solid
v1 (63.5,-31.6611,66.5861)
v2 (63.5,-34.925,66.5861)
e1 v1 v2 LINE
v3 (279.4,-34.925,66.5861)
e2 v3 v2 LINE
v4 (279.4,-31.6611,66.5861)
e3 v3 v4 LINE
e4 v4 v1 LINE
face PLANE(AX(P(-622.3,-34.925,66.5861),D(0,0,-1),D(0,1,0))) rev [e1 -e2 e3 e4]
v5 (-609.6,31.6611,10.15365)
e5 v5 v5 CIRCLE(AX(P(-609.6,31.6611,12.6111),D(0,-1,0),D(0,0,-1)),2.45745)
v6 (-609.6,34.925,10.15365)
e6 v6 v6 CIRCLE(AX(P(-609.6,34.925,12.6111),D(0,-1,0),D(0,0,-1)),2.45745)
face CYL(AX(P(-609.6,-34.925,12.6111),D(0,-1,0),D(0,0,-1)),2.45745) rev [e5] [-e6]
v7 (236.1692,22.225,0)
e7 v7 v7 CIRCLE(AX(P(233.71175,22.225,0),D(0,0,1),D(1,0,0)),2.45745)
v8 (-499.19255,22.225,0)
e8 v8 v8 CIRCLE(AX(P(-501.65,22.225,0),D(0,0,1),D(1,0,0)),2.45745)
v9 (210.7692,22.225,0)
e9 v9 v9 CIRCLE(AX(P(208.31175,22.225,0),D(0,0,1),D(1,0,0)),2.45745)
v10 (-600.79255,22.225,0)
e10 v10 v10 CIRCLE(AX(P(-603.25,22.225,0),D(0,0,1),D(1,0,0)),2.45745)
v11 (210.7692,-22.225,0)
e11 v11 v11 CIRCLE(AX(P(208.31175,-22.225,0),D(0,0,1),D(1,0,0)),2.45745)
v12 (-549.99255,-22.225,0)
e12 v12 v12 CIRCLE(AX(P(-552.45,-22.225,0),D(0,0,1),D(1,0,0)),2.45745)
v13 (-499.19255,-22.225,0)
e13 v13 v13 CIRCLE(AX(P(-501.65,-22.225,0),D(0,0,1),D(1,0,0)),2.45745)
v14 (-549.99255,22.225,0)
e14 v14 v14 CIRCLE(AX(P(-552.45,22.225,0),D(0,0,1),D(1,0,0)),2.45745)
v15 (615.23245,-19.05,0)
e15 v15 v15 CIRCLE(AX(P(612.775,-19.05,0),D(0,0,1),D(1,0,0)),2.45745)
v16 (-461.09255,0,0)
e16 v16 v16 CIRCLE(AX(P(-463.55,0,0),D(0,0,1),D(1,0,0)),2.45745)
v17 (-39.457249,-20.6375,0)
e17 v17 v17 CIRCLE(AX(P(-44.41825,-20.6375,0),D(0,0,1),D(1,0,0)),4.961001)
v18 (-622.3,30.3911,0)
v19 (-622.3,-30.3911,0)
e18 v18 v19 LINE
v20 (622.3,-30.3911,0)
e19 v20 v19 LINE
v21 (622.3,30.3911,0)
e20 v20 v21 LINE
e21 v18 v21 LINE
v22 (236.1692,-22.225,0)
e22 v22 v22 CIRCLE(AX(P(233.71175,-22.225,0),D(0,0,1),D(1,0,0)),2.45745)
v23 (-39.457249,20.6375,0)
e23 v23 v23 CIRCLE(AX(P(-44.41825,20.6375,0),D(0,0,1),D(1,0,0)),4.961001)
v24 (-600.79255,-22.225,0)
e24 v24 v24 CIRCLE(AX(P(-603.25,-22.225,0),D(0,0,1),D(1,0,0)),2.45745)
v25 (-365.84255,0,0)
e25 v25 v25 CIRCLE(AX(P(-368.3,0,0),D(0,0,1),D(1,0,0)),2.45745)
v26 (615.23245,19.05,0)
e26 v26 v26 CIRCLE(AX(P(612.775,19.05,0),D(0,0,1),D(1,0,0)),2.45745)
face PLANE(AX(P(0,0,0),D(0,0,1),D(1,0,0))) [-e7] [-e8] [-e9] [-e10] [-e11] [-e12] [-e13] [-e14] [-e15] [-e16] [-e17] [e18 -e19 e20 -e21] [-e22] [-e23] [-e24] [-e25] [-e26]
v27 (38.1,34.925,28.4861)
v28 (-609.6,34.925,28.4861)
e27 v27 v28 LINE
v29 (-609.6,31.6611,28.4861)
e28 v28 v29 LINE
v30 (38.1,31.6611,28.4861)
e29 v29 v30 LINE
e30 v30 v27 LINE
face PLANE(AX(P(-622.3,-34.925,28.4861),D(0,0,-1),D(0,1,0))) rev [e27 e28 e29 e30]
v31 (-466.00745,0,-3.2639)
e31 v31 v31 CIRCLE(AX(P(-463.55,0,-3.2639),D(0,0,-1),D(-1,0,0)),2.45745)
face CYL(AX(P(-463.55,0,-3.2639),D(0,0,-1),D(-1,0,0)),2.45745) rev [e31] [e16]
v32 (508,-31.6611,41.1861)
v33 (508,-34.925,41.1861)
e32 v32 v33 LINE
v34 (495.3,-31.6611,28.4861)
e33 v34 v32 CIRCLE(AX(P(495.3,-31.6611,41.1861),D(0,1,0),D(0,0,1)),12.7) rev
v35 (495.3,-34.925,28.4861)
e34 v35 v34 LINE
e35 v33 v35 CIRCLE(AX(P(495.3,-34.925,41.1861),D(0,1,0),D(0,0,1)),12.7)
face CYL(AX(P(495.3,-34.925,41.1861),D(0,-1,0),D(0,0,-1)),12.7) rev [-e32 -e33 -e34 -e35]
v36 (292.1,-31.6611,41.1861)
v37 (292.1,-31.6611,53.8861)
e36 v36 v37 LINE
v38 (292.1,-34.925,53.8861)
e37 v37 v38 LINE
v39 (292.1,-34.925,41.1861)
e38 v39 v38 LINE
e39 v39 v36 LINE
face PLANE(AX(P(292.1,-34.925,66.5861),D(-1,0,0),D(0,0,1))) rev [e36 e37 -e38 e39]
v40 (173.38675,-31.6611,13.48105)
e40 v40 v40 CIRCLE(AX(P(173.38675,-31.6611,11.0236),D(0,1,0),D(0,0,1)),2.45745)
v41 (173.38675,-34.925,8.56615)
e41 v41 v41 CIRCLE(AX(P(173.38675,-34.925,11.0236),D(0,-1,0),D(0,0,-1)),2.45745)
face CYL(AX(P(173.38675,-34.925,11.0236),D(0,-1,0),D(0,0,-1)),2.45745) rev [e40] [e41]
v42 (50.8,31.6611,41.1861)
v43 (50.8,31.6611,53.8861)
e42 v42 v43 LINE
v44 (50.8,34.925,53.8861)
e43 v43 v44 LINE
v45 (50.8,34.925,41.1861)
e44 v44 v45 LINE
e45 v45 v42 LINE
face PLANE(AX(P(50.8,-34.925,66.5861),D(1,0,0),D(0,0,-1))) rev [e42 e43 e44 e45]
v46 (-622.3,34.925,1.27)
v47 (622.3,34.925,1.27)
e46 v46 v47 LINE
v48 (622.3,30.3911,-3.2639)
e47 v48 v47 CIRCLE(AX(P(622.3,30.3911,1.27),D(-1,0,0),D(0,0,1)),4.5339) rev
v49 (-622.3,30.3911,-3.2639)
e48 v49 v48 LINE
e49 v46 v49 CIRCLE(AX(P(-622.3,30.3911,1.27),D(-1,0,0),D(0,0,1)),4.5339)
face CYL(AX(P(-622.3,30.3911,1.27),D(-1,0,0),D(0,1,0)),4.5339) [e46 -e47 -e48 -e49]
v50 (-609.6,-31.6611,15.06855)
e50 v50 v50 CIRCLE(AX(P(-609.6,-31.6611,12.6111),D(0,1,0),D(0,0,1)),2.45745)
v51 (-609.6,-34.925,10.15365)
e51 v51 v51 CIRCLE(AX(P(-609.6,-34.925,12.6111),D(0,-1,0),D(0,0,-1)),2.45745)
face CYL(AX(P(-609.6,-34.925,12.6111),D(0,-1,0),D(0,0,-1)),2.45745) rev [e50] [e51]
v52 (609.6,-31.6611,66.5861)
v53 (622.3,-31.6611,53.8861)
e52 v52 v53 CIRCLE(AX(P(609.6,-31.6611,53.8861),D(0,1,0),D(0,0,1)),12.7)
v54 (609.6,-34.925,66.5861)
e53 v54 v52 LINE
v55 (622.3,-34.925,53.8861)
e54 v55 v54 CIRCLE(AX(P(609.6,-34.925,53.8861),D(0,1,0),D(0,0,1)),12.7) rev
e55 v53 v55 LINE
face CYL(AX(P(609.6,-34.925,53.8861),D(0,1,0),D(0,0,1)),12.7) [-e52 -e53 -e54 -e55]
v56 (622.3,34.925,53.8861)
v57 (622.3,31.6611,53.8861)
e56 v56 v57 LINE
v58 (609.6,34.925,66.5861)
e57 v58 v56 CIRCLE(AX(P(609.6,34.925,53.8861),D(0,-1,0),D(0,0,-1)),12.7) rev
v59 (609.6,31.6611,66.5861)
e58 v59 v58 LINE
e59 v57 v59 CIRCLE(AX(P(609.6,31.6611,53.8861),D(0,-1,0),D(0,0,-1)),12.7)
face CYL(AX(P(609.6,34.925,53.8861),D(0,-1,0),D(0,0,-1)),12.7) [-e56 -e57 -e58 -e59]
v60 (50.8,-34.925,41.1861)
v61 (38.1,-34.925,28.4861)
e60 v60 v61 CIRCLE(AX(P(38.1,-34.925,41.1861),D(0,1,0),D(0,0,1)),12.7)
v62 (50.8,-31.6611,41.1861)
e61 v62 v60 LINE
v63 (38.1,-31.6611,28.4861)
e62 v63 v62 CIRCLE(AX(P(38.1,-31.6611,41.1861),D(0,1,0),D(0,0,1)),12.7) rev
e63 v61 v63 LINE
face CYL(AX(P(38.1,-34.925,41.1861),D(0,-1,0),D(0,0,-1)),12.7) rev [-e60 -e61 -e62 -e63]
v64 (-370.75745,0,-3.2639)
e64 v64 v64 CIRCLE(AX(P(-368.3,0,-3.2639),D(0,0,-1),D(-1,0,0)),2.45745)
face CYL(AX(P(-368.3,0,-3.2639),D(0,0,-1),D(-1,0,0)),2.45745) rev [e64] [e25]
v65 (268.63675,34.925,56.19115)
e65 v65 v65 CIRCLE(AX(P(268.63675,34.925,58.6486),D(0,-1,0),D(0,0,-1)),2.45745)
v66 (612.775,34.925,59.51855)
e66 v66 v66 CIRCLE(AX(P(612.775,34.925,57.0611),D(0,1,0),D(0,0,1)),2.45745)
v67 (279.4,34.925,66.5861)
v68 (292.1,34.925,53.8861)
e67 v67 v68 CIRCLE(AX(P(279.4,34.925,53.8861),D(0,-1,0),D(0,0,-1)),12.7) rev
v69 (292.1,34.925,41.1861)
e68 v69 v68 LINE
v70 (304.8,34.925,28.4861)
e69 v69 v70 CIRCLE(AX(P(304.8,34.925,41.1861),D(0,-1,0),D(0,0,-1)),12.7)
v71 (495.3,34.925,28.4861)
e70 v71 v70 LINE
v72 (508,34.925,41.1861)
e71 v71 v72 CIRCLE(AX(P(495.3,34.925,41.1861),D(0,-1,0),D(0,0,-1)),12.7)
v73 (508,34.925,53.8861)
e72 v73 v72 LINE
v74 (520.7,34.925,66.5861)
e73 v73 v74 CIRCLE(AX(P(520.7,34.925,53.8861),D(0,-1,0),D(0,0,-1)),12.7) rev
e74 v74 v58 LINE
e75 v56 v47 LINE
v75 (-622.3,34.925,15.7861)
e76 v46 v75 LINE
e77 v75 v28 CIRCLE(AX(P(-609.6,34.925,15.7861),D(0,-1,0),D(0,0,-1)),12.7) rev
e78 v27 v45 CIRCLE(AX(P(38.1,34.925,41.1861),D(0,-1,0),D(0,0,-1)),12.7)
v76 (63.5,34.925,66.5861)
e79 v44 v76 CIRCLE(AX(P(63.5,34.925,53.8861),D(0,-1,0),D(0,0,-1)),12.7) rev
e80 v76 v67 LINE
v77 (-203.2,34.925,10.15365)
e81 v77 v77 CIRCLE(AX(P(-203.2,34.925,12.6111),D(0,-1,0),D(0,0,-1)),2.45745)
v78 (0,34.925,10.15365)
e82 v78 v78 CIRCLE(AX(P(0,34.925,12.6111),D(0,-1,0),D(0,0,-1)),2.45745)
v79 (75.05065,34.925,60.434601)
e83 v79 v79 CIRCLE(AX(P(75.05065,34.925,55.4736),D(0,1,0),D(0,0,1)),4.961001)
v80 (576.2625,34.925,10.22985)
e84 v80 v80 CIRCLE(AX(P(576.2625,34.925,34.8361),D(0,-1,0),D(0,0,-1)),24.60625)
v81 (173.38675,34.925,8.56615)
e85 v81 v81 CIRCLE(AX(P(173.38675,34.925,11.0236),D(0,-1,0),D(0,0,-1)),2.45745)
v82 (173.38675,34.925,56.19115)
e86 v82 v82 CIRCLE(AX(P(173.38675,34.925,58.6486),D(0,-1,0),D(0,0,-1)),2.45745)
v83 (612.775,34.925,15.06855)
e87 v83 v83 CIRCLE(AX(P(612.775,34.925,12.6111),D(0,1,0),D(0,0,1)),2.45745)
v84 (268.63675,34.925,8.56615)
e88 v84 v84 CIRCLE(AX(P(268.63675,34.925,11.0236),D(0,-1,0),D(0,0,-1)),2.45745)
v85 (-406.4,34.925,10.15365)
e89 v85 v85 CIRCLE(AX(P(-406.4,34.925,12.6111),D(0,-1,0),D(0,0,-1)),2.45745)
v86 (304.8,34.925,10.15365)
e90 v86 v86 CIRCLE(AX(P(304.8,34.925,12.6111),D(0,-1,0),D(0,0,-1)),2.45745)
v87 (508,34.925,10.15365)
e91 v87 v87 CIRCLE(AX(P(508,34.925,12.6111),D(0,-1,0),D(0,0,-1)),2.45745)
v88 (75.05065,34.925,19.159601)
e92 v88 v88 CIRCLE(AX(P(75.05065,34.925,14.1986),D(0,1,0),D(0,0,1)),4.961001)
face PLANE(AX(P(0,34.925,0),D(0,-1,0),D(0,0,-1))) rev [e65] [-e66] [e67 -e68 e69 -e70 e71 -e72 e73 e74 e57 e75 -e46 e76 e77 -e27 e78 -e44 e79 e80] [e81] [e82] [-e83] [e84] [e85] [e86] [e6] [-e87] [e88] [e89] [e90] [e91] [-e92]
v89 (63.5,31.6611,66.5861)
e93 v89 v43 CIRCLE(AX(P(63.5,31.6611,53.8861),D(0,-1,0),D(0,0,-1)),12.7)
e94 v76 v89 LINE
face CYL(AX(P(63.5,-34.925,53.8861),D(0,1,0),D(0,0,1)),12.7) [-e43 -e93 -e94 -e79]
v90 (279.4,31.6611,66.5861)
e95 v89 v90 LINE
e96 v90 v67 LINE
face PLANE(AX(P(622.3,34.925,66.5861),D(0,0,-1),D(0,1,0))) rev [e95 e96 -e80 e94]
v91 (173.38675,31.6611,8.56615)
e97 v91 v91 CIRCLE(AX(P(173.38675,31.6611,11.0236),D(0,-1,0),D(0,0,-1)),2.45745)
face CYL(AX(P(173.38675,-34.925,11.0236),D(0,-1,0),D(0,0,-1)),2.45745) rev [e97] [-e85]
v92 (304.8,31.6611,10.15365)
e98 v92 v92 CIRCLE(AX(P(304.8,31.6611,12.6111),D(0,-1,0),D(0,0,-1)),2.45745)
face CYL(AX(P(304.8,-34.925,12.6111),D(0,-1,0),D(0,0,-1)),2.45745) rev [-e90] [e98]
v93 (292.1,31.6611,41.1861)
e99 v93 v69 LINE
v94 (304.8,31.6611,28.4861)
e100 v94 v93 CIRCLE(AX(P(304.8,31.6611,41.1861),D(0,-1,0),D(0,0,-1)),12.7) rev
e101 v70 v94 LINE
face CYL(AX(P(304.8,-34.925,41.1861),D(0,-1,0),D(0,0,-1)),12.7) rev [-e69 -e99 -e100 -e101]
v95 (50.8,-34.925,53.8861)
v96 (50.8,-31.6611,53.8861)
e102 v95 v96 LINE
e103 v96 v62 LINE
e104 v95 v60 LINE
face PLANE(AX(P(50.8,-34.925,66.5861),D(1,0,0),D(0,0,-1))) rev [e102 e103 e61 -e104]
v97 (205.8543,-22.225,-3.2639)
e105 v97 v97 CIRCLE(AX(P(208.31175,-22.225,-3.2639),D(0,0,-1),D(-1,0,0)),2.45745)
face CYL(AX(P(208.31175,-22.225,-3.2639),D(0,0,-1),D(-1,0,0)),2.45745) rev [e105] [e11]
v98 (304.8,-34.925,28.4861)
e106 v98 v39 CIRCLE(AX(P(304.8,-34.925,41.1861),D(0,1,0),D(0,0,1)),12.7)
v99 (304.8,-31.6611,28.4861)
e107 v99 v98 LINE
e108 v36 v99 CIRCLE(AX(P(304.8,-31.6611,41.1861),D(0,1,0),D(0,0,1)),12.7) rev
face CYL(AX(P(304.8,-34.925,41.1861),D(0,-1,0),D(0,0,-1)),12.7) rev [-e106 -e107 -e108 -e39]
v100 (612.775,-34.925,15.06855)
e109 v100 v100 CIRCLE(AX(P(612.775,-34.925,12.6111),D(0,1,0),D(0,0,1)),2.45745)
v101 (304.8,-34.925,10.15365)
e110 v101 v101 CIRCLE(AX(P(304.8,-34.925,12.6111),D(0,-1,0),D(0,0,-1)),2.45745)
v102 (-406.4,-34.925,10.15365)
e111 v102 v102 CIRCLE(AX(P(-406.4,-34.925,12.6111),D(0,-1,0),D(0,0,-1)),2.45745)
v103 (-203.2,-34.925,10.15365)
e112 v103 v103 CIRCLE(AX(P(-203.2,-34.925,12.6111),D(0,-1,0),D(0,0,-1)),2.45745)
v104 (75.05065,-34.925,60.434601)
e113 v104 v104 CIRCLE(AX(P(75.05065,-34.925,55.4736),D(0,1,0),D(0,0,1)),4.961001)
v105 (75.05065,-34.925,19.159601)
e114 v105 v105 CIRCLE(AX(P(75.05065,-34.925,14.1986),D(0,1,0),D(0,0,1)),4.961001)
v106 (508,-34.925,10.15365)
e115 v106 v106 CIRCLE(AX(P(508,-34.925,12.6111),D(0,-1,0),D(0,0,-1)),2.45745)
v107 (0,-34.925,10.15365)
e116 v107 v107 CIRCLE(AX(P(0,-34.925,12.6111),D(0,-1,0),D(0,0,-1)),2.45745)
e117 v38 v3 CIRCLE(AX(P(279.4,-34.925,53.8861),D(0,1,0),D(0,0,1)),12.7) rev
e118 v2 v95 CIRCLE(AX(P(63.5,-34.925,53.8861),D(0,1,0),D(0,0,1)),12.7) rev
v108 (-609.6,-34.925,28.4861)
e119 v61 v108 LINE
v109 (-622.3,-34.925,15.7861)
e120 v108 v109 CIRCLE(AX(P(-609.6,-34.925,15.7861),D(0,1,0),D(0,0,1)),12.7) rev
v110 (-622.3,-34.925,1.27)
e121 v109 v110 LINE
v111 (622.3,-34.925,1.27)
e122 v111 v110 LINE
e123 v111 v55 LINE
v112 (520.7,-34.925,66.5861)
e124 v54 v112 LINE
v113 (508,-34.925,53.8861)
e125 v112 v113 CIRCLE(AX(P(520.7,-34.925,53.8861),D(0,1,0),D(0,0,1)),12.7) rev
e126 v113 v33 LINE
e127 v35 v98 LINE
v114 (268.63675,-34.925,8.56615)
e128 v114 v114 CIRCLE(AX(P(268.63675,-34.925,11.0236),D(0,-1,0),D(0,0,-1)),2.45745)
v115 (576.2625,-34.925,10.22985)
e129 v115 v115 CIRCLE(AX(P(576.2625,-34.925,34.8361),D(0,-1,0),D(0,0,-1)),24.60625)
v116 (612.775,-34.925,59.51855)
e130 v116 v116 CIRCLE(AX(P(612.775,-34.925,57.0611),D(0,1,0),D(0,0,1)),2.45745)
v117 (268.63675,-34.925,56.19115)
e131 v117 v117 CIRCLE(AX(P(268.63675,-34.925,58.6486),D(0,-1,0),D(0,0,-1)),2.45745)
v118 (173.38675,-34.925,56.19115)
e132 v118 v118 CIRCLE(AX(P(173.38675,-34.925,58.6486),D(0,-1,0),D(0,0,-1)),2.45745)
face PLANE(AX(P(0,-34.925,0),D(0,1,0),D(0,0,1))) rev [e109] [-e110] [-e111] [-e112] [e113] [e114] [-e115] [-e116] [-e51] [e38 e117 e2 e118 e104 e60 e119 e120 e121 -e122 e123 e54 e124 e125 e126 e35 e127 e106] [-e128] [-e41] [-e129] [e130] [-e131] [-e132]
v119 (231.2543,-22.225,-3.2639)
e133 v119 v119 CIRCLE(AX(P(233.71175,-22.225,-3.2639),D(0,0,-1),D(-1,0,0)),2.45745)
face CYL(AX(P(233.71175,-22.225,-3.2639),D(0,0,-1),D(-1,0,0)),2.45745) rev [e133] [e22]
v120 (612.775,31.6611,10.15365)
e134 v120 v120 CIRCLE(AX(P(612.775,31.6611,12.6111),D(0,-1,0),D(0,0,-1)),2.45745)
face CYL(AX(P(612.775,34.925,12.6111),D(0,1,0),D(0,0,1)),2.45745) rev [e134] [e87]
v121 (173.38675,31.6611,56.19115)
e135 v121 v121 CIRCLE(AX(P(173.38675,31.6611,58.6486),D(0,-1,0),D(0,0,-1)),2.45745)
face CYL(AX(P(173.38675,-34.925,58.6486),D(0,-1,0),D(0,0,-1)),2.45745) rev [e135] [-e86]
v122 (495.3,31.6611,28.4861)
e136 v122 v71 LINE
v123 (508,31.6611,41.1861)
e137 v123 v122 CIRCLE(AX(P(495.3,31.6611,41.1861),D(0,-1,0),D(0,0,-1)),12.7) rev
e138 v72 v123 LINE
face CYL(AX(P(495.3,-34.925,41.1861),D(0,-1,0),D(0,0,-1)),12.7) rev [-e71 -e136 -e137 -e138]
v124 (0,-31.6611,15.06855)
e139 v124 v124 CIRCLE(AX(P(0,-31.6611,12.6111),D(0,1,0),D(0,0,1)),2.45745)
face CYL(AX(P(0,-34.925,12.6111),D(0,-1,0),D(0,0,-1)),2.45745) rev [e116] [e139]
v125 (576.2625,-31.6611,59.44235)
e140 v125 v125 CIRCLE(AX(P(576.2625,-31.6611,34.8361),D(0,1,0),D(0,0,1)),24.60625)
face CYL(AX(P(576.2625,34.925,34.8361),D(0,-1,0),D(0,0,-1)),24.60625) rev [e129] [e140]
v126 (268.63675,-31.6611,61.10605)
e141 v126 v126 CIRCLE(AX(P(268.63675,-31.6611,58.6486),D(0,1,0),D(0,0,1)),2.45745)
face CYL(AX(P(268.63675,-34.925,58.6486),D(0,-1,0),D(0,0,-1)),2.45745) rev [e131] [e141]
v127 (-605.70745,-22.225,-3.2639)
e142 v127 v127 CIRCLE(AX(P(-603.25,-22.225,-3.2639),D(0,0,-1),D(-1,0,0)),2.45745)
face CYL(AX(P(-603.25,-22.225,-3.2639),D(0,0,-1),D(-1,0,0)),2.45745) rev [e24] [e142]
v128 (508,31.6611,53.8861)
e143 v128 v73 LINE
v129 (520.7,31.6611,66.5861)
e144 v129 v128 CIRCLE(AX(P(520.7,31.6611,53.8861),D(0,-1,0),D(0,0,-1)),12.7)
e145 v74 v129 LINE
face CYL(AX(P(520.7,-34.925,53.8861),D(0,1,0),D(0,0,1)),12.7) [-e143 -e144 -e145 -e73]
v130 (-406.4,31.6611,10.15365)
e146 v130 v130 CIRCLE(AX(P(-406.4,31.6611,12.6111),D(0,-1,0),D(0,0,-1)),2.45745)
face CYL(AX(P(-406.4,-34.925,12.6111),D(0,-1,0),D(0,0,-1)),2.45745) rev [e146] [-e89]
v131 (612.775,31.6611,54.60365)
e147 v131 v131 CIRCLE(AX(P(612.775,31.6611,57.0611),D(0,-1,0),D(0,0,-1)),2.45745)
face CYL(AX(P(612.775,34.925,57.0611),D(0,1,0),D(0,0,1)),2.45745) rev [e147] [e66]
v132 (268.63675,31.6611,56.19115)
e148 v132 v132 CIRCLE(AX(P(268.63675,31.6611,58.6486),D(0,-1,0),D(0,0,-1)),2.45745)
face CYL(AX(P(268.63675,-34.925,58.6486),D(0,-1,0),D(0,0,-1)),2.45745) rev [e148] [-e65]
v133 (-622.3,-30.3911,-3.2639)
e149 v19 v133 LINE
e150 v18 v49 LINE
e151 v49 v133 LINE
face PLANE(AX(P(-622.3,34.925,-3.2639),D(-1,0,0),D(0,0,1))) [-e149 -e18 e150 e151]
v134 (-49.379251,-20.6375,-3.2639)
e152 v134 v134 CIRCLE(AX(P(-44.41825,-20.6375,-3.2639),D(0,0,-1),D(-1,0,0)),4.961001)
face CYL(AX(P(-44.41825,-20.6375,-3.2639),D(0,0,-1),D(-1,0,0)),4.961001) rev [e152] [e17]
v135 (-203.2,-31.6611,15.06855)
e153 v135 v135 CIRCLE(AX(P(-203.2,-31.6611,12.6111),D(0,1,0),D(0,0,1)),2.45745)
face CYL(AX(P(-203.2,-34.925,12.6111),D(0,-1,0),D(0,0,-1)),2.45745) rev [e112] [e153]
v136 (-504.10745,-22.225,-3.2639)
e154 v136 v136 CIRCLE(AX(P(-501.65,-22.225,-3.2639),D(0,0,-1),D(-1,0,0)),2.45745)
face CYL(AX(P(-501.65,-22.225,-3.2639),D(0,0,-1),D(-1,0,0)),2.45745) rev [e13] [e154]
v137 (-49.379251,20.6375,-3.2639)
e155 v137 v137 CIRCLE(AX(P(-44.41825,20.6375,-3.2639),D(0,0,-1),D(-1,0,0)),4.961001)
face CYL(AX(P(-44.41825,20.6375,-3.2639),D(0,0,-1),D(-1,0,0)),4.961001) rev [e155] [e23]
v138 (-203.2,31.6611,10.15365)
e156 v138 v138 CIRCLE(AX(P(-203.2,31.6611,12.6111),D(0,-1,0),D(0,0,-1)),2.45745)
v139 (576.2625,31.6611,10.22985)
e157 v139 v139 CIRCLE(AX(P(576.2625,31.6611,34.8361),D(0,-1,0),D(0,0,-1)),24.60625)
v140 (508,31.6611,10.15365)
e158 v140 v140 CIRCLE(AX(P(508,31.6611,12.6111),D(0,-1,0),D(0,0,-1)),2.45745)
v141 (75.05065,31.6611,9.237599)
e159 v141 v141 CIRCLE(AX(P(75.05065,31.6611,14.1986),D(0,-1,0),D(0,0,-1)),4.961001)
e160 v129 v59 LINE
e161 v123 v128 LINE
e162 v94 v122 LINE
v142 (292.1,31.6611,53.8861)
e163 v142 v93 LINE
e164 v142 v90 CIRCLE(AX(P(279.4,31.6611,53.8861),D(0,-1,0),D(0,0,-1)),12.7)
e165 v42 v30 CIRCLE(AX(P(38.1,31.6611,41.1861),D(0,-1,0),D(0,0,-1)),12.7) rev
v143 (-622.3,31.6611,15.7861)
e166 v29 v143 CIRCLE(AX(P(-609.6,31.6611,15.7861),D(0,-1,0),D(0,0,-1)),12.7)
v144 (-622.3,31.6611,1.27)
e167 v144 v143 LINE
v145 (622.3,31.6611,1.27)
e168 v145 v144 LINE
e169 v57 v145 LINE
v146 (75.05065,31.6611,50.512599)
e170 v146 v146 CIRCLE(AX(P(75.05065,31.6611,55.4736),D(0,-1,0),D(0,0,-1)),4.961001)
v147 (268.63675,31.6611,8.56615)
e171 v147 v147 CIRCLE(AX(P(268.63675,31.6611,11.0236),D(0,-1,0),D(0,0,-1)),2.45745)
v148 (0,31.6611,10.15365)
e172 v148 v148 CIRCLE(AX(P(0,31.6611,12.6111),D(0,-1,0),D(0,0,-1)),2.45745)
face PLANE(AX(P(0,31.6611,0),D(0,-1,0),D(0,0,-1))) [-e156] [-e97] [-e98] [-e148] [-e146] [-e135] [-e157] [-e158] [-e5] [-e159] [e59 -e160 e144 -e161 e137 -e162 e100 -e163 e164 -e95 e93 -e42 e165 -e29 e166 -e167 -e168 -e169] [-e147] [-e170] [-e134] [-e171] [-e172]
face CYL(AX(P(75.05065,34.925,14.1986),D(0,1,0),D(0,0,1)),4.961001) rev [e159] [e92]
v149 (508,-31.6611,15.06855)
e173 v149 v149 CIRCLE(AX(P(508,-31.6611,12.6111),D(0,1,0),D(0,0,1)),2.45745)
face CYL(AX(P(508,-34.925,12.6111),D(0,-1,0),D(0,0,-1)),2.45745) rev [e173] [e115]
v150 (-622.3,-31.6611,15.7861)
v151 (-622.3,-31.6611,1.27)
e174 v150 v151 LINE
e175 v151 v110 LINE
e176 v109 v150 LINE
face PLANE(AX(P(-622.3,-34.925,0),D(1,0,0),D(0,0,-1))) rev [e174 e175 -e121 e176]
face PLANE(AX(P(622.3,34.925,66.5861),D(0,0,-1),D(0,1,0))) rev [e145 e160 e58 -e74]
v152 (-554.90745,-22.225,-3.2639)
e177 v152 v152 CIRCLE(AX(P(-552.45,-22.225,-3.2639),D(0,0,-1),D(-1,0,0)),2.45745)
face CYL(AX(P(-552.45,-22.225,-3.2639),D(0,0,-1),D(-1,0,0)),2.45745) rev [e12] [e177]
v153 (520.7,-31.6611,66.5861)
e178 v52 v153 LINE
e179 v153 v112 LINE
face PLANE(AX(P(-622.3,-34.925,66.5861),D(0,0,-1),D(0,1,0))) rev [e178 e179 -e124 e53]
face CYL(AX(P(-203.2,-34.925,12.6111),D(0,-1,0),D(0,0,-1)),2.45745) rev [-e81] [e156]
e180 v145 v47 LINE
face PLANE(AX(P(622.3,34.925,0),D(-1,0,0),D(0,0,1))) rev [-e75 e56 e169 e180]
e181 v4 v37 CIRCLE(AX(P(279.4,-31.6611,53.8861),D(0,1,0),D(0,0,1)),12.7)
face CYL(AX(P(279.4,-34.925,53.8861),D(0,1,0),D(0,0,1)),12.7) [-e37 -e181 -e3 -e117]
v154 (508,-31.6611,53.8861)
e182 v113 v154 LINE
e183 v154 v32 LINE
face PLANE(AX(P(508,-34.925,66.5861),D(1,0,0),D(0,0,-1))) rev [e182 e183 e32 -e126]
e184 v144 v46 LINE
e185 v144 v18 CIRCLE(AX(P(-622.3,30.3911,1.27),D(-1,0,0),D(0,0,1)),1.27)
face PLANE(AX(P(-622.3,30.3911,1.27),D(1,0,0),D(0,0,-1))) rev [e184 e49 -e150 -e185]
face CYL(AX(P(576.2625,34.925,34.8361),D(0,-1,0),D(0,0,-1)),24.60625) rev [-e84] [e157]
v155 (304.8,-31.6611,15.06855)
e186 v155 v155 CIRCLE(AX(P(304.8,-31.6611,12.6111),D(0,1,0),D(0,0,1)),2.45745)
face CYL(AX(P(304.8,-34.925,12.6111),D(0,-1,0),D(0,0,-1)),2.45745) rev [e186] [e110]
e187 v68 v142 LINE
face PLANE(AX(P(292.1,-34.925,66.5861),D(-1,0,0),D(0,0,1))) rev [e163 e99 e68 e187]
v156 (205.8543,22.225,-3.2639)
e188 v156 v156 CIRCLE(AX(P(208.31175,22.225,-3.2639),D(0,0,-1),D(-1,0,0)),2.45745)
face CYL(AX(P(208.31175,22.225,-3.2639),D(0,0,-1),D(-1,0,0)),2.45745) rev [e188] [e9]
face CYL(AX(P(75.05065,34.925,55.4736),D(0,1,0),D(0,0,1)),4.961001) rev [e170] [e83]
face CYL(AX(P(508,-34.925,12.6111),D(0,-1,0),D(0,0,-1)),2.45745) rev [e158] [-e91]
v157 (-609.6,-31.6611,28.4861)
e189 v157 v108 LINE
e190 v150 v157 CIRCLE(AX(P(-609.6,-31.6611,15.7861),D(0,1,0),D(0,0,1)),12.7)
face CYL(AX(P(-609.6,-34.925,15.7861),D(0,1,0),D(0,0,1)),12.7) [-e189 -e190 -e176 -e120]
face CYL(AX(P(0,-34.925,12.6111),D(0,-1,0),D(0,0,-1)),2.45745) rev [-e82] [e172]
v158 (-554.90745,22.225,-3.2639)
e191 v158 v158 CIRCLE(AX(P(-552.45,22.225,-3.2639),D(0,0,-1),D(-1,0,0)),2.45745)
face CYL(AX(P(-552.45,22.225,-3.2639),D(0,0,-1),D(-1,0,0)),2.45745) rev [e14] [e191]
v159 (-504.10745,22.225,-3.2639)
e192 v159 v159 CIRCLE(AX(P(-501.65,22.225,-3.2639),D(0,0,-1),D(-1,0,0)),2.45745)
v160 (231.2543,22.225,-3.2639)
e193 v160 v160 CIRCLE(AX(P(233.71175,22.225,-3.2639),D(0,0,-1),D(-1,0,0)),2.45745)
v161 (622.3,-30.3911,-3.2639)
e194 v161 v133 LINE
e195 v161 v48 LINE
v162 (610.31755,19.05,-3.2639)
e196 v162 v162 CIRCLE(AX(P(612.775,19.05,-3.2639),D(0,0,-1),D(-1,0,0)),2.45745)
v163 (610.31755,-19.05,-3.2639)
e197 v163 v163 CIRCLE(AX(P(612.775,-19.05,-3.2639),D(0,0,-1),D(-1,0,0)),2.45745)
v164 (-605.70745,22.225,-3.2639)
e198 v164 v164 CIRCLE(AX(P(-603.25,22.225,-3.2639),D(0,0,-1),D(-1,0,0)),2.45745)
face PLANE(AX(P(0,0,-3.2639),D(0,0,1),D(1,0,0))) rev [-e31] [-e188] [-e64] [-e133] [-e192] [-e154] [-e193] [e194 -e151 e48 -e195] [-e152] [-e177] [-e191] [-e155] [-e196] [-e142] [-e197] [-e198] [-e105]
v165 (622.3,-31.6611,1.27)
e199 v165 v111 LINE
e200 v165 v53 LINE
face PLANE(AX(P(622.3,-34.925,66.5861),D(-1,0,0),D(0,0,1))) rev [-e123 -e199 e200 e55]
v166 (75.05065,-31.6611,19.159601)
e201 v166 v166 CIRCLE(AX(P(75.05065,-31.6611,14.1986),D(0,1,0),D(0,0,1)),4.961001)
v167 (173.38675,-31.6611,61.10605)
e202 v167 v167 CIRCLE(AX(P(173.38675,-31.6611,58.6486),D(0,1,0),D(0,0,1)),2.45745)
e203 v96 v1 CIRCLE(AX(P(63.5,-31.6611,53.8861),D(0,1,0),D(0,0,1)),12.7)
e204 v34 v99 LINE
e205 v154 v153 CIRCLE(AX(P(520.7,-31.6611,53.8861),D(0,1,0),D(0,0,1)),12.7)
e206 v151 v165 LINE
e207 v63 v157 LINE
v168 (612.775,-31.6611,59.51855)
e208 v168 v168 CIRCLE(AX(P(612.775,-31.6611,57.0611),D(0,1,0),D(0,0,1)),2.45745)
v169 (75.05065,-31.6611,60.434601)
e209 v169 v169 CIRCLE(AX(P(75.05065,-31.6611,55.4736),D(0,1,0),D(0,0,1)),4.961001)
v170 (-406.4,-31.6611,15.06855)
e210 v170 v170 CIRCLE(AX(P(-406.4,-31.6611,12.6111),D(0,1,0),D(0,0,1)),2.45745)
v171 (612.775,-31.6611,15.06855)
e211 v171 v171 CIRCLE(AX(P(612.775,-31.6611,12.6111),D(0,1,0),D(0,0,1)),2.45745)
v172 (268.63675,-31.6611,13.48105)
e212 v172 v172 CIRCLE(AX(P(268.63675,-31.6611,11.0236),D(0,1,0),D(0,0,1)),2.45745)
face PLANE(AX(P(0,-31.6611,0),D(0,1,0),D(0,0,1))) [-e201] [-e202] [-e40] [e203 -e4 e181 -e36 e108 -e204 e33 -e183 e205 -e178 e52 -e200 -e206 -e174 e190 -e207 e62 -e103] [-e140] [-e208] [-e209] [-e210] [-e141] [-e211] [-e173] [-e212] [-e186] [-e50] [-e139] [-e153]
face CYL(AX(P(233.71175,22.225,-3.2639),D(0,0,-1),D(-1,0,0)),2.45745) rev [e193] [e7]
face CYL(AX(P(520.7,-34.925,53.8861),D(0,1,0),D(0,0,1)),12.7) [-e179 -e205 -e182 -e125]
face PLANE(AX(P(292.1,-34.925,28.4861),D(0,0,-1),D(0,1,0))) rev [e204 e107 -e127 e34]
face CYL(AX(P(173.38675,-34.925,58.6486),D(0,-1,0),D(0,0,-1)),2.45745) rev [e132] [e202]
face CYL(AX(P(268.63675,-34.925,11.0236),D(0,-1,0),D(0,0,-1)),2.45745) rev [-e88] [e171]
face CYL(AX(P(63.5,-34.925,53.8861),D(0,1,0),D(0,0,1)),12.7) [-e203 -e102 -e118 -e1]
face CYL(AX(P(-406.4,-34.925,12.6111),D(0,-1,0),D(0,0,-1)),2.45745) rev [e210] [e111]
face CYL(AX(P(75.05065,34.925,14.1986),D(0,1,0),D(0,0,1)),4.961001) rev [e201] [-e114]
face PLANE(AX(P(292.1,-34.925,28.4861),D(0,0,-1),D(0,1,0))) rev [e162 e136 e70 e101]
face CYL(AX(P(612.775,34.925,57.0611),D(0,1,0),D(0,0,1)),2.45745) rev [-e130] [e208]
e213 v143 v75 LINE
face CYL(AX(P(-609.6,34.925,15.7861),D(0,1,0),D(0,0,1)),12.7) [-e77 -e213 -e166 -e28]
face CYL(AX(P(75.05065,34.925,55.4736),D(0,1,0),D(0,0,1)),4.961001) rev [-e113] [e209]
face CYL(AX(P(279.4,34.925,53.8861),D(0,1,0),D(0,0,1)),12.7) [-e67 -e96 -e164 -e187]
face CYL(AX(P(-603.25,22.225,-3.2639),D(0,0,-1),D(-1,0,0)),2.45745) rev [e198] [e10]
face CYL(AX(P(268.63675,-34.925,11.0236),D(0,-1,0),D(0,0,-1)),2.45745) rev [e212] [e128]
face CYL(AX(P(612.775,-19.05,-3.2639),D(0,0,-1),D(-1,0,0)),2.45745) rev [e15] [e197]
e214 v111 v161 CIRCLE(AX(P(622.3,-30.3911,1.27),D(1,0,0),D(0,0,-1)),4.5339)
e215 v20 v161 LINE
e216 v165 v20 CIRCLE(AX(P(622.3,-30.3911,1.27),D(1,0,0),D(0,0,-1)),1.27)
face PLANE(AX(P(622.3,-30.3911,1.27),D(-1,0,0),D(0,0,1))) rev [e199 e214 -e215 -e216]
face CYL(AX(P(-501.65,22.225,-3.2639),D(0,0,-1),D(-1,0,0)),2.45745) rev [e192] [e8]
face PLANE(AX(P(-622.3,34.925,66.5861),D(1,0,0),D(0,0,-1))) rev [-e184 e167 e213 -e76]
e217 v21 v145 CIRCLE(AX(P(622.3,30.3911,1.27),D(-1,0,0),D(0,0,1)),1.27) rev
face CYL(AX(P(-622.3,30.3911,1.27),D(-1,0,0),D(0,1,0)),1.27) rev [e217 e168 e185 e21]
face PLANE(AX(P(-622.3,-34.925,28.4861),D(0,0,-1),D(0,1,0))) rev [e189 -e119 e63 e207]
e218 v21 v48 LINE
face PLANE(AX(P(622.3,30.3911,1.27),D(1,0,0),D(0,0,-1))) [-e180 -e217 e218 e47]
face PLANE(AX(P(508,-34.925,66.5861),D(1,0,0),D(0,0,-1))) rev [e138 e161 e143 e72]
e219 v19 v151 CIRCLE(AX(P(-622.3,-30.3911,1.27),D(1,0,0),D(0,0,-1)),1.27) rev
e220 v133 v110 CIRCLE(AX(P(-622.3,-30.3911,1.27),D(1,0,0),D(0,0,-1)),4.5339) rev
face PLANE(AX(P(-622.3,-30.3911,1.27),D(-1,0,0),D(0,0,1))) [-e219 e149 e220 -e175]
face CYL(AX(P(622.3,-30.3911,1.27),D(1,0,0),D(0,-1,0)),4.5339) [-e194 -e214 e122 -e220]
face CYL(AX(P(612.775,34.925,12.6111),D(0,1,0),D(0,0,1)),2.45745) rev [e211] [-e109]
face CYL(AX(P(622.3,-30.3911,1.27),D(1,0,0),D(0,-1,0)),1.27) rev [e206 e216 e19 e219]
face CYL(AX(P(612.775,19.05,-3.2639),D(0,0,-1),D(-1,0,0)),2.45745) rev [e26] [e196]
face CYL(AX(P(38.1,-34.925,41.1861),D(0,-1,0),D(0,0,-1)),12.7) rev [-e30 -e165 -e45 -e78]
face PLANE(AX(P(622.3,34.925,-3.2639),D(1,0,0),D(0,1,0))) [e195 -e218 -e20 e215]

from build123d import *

# Parameters (mm, degrees)
SKETCH2_W                        = 1244.6
SKETCH2_H                        = 69.85
BASE_FLANGE1_DEPTH               = 3.2639
EDGE_FLANGE1_STRIP_W             = 15.5956
EDGE_FLANGE1_STRIP_H             = 3.2639
EDGE_FLANGE1_STRIP_CUT_DEPTH     = 1244.6
EDGE_FLANGE1_STRIP_2_W           = 15.5956
EDGE_FLANGE1_STRIP_2_H           = 3.2639
EDGE_FLANGE1_STRIP_CUT_2_DEPTH   = 1244.6
EDGE_FLANGE1_DEPTH               = 1244.6
EDGE_FLANGE1_BEND_DEPTH          = 1244.6
F_10_0_1935_DIAMETER_HOLE1_D     = 4.9149
SKETCH28_R                       = 24.60625
CUT_EXTRUDE1_DEPTH               = 630.738057619
F_10_0_1935_DIAMETER_HOLE5_D     = 4.9149
F_10_0_1935_DIAMETER_HOLE6_D     = 4.9149
F_10_0_1935_DIAMETER_HOLE7_D     = 4.9149
F_25_64_0_39063_DIAMETER_HOLE1_D = 9.922002
F_25_64_0_39063_DIAMETER_HOLE2_D = 9.922002
F_10_0_1935_DIAMETER_HOLE9_D     = 4.9149
LPATTERN1_COUNT                  = 13
LPATTERN1_PITCH                  = 101.6
F_10_0_1935_DIAMETER_HOLE10_D    = 4.9149
F_10_0_1935_DIAMETER_HOLE11_D    = 4.9149
SKETCH69_W                       = 673.1
SKETCH69_H                       = 38.1
SKETCH69_W_2                     = 215.9
CUT_EXTRUDE2_DEPTH               = 630.738057619
FILLET3_R                        = 12.7


# Sheet-metal steps are written as plain solids
with BuildPart() as part:
    # Sketch2 → Base-Flange1 (new body)
    with BuildSketch(Plane.XY):
        Rectangle(SKETCH2_W, SKETCH2_H)
    extrude(amount=-BASE_FLANGE1_DEPTH)

    # Edge-Flange1 strip (across the edge) → Edge-Flange1 strip cut (cut)
    with BuildSketch(Plane(origin=(622.3, 34.925, 0), x_dir=(0, -1, 0), z_dir=(-1, 0, 0))):
        with Locations((-3.2639, -1.63195)):
            Rectangle(EDGE_FLANGE1_STRIP_W, EDGE_FLANGE1_STRIP_H)
    extrude(amount=EDGE_FLANGE1_STRIP_CUT_DEPTH, mode=Mode.SUBTRACT)

    # Edge-Flange1 strip 2 (across the edge) → Edge-Flange1 strip cut 2 (cut)
    with BuildSketch(Plane(origin=(-622.3, -34.925, 0), x_dir=(0, 1, 0), z_dir=(1, 0, 0))):
        with Locations((-3.2639, -1.63195)):
            Rectangle(EDGE_FLANGE1_STRIP_2_W, EDGE_FLANGE1_STRIP_2_H)
    extrude(amount=EDGE_FLANGE1_STRIP_CUT_2_DEPTH, mode=Mode.SUBTRACT)

    # Edge-Flange1 section (across the edge) → Edge-Flange1 (add)
    with BuildSketch(Plane(origin=(622.3, 34.925, 0), x_dir=(0, -1, 0), z_dir=(-1, 0, 0))):
        with BuildLine():
            Line((0, 1.27), (0, 66.5861))
            Line((0, 66.5861), (3.2639, 66.5861))
            Line((3.2639, 66.5861), (3.2639, 1.27))
            ThreePointArc((3.2639, 1.27), (3.635874388, 0.371974388), (4.5339, 0))
            Line((4.5339, 0), (4.5339, -3.2639))
            ThreePointArc((4.5339, -3.2639), (1.327948565, -1.935951435), (0, 1.27))
        make_face()
    extrude(amount=EDGE_FLANGE1_DEPTH)

    # Edge-Flange1 section 2 (across the edge) → Edge-Flange1 bend (add)
    with BuildSketch(Plane(origin=(-622.3, -34.925, 0), x_dir=(0, 1, 0), z_dir=(1, 0, 0))):
        with BuildLine():
            Line((0, 1.27), (0, 66.5861))
            Line((0, 66.5861), (3.2639, 66.5861))
            Line((3.2639, 66.5861), (3.2639, 1.27))
            ThreePointArc((3.2639, 1.27), (3.635874388, 0.371974388), (4.5339, 0))
            Line((4.5339, 0), (4.5339, -3.2639))
            ThreePointArc((4.5339, -3.2639), (1.327948565, -1.935951435), (0, 1.27))
        make_face()
    extrude(amount=EDGE_FLANGE1_BEND_DEPTH)

    # #10 (0.1935) Diameter Hole1 (through all)
    with Locations(Plane(origin=(0, 0, -3.2639), x_dir=(-1, 0, 0), z_dir=(0, 0, -1))):
        with Locations((552.45, 22.225), (603.25, 22.225), (603.25, -22.225), (552.45, -22.225), (501.65, -22.225), (501.65, 22.225)):
            Hole(F_10_0_1935_DIAMETER_HOLE1_D / 2)

    # Sketch28 → Cut-Extrude1 (cut, through all)
    with BuildSketch(Plane.XZ.offset(34.925)):
        with Locations(Location((576.2625, 34.8361, 0), (0, 0, 270))):
            Circle(SKETCH28_R)
    extrude(amount=-CUT_EXTRUDE1_DEPTH, mode=Mode.SUBTRACT)

    # #10 (0.1935) Diameter Hole5 (through all)
    with Locations(Plane(origin=(0, -34.925, 0), x_dir=(-1, 0, 0), z_dir=(0, -1, 0))):
        with Locations((-173.38675, -58.6486), (-173.38675, -11.0236), (-268.63675, -58.6486), (-268.63675, -11.0236)):
            Hole(F_10_0_1935_DIAMETER_HOLE5_D / 2)

    # #10 (0.1935) Diameter Hole6 (through all)
    with Locations(Plane(origin=(0, 0, -3.2639), x_dir=(-1, 0, 0), z_dir=(0, 0, -1))):
        with Locations((-233.71175, 22.225), (-208.31175, 22.225), (-208.31175, -22.225), (-233.71175, -22.225)):
            Hole(F_10_0_1935_DIAMETER_HOLE6_D / 2)

    # #10 (0.1935) Diameter Hole7 (through all)
    with Locations(Plane(origin=(0, 0, -3.2639), x_dir=(-1, 0, 0), z_dir=(0, 0, -1))):
        with Locations((463.55, 0), (368.3, 0)):
            Hole(F_10_0_1935_DIAMETER_HOLE7_D / 2)

    # 25/64 (0.39063) Diameter Hole1 (through all)
    with Locations(Plane(origin=(0, 0, -3.2639), x_dir=(-1, 0, 0), z_dir=(0, 0, -1))):
        with Locations((44.41825, -20.6375), (44.41825, 20.6375)):
            Hole(F_25_64_0_39063_DIAMETER_HOLE1_D / 2)

    # 25/64 (0.39063) Diameter Hole2 (through all)
    with Locations(Plane(origin=(0, 34.925, 0), x_dir=(1, 0, 0), z_dir=(0, 1, 0))):
        with Locations((75.05065, -14.1986), (75.05065, -55.4736)):
            Hole(F_25_64_0_39063_DIAMETER_HOLE2_D / 2)

    # #10 (0.1935) Diameter Hole9 (through all)
    with Locations(Plane(origin=(0, -34.925, 0), x_dir=(-1, 0, 0), z_dir=(0, -1, 0))):
        with Locations((609.6, -12.6111)):
            f_10_0_1935_diameter_hole9 = Hole(F_10_0_1935_DIAMETER_HOLE9_D / 2)

    # LPattern1: #10 (0.1935) Diameter Hole9 ×13, 7 skipped
    with Locations(*[(i * LPATTERN1_PITCH, 0, 0) for i in range(1, LPATTERN1_COUNT) if i not in (1, 3, 5, 7, 8, 10, 12)]):
        add(f_10_0_1935_diameter_hole9, mode=Mode.SUBTRACT)

    # #10 (0.1935) Diameter Hole10 (through all)
    with Locations(Plane(origin=(0, 34.925, 0), x_dir=(1, 0, 0), z_dir=(0, 1, 0))):
        with Locations((612.775, -12.6111), (612.775, -57.0611)):
            Hole(F_10_0_1935_DIAMETER_HOLE10_D / 2)

    # #10 (0.1935) Diameter Hole11 (through all)
    with Locations(Plane(origin=(0, 0, -3.2639), x_dir=(-1, 0, 0), z_dir=(0, 0, -1))):
        with Locations((-612.775, 19.05), (-612.775, -19.05)):
            Hole(F_10_0_1935_DIAMETER_HOLE11_D / 2)

    # Sketch69 → Cut-Extrude2 (cut, through all)
    with BuildSketch(Plane(origin=(0, 34.925, 0), x_dir=(1, 0, 0), z_dir=(0, 1, 0))):
        with Locations((-285.75, -47.5361)):
            Rectangle(SKETCH69_W, SKETCH69_H)
        with Locations((400.05, -47.5361)):
            Rectangle(SKETCH69_W_2, SKETCH69_H)
    extrude(amount=-CUT_EXTRUDE2_DEPTH, mode=Mode.SUBTRACT)

    # Fillet3
    fillet3_edges = [part.edges().sort_by_distance(p)[0] for p in [
        (-622.3, 33.29305, 28.4861),
        (50.8, 33.29305, 66.5861),
        (50.8, 33.29305, 28.4861),
        (-622.3, -33.29305, 28.4861),
        (50.8, -33.29305, 28.4861),
        (50.8, -33.29305, 66.5861),
        (292.1, 33.29305, 28.4861),
        (508, 33.29305, 66.5861),
        (292.1, 33.29305, 66.5861),
        (508, 33.29305, 28.4861),
        (292.1, -33.29305, 66.5861),
        (292.1, -33.29305, 28.4861),
        (508, -33.29305, 28.4861),
        (508, -33.29305, 66.5861),
        (622.3, 33.29305, 66.5861),
        (622.3, -33.29305, 66.5861),
    ]]
    fillet(fillet3_edges, radius=FILLET3_R)


solid = part.part
